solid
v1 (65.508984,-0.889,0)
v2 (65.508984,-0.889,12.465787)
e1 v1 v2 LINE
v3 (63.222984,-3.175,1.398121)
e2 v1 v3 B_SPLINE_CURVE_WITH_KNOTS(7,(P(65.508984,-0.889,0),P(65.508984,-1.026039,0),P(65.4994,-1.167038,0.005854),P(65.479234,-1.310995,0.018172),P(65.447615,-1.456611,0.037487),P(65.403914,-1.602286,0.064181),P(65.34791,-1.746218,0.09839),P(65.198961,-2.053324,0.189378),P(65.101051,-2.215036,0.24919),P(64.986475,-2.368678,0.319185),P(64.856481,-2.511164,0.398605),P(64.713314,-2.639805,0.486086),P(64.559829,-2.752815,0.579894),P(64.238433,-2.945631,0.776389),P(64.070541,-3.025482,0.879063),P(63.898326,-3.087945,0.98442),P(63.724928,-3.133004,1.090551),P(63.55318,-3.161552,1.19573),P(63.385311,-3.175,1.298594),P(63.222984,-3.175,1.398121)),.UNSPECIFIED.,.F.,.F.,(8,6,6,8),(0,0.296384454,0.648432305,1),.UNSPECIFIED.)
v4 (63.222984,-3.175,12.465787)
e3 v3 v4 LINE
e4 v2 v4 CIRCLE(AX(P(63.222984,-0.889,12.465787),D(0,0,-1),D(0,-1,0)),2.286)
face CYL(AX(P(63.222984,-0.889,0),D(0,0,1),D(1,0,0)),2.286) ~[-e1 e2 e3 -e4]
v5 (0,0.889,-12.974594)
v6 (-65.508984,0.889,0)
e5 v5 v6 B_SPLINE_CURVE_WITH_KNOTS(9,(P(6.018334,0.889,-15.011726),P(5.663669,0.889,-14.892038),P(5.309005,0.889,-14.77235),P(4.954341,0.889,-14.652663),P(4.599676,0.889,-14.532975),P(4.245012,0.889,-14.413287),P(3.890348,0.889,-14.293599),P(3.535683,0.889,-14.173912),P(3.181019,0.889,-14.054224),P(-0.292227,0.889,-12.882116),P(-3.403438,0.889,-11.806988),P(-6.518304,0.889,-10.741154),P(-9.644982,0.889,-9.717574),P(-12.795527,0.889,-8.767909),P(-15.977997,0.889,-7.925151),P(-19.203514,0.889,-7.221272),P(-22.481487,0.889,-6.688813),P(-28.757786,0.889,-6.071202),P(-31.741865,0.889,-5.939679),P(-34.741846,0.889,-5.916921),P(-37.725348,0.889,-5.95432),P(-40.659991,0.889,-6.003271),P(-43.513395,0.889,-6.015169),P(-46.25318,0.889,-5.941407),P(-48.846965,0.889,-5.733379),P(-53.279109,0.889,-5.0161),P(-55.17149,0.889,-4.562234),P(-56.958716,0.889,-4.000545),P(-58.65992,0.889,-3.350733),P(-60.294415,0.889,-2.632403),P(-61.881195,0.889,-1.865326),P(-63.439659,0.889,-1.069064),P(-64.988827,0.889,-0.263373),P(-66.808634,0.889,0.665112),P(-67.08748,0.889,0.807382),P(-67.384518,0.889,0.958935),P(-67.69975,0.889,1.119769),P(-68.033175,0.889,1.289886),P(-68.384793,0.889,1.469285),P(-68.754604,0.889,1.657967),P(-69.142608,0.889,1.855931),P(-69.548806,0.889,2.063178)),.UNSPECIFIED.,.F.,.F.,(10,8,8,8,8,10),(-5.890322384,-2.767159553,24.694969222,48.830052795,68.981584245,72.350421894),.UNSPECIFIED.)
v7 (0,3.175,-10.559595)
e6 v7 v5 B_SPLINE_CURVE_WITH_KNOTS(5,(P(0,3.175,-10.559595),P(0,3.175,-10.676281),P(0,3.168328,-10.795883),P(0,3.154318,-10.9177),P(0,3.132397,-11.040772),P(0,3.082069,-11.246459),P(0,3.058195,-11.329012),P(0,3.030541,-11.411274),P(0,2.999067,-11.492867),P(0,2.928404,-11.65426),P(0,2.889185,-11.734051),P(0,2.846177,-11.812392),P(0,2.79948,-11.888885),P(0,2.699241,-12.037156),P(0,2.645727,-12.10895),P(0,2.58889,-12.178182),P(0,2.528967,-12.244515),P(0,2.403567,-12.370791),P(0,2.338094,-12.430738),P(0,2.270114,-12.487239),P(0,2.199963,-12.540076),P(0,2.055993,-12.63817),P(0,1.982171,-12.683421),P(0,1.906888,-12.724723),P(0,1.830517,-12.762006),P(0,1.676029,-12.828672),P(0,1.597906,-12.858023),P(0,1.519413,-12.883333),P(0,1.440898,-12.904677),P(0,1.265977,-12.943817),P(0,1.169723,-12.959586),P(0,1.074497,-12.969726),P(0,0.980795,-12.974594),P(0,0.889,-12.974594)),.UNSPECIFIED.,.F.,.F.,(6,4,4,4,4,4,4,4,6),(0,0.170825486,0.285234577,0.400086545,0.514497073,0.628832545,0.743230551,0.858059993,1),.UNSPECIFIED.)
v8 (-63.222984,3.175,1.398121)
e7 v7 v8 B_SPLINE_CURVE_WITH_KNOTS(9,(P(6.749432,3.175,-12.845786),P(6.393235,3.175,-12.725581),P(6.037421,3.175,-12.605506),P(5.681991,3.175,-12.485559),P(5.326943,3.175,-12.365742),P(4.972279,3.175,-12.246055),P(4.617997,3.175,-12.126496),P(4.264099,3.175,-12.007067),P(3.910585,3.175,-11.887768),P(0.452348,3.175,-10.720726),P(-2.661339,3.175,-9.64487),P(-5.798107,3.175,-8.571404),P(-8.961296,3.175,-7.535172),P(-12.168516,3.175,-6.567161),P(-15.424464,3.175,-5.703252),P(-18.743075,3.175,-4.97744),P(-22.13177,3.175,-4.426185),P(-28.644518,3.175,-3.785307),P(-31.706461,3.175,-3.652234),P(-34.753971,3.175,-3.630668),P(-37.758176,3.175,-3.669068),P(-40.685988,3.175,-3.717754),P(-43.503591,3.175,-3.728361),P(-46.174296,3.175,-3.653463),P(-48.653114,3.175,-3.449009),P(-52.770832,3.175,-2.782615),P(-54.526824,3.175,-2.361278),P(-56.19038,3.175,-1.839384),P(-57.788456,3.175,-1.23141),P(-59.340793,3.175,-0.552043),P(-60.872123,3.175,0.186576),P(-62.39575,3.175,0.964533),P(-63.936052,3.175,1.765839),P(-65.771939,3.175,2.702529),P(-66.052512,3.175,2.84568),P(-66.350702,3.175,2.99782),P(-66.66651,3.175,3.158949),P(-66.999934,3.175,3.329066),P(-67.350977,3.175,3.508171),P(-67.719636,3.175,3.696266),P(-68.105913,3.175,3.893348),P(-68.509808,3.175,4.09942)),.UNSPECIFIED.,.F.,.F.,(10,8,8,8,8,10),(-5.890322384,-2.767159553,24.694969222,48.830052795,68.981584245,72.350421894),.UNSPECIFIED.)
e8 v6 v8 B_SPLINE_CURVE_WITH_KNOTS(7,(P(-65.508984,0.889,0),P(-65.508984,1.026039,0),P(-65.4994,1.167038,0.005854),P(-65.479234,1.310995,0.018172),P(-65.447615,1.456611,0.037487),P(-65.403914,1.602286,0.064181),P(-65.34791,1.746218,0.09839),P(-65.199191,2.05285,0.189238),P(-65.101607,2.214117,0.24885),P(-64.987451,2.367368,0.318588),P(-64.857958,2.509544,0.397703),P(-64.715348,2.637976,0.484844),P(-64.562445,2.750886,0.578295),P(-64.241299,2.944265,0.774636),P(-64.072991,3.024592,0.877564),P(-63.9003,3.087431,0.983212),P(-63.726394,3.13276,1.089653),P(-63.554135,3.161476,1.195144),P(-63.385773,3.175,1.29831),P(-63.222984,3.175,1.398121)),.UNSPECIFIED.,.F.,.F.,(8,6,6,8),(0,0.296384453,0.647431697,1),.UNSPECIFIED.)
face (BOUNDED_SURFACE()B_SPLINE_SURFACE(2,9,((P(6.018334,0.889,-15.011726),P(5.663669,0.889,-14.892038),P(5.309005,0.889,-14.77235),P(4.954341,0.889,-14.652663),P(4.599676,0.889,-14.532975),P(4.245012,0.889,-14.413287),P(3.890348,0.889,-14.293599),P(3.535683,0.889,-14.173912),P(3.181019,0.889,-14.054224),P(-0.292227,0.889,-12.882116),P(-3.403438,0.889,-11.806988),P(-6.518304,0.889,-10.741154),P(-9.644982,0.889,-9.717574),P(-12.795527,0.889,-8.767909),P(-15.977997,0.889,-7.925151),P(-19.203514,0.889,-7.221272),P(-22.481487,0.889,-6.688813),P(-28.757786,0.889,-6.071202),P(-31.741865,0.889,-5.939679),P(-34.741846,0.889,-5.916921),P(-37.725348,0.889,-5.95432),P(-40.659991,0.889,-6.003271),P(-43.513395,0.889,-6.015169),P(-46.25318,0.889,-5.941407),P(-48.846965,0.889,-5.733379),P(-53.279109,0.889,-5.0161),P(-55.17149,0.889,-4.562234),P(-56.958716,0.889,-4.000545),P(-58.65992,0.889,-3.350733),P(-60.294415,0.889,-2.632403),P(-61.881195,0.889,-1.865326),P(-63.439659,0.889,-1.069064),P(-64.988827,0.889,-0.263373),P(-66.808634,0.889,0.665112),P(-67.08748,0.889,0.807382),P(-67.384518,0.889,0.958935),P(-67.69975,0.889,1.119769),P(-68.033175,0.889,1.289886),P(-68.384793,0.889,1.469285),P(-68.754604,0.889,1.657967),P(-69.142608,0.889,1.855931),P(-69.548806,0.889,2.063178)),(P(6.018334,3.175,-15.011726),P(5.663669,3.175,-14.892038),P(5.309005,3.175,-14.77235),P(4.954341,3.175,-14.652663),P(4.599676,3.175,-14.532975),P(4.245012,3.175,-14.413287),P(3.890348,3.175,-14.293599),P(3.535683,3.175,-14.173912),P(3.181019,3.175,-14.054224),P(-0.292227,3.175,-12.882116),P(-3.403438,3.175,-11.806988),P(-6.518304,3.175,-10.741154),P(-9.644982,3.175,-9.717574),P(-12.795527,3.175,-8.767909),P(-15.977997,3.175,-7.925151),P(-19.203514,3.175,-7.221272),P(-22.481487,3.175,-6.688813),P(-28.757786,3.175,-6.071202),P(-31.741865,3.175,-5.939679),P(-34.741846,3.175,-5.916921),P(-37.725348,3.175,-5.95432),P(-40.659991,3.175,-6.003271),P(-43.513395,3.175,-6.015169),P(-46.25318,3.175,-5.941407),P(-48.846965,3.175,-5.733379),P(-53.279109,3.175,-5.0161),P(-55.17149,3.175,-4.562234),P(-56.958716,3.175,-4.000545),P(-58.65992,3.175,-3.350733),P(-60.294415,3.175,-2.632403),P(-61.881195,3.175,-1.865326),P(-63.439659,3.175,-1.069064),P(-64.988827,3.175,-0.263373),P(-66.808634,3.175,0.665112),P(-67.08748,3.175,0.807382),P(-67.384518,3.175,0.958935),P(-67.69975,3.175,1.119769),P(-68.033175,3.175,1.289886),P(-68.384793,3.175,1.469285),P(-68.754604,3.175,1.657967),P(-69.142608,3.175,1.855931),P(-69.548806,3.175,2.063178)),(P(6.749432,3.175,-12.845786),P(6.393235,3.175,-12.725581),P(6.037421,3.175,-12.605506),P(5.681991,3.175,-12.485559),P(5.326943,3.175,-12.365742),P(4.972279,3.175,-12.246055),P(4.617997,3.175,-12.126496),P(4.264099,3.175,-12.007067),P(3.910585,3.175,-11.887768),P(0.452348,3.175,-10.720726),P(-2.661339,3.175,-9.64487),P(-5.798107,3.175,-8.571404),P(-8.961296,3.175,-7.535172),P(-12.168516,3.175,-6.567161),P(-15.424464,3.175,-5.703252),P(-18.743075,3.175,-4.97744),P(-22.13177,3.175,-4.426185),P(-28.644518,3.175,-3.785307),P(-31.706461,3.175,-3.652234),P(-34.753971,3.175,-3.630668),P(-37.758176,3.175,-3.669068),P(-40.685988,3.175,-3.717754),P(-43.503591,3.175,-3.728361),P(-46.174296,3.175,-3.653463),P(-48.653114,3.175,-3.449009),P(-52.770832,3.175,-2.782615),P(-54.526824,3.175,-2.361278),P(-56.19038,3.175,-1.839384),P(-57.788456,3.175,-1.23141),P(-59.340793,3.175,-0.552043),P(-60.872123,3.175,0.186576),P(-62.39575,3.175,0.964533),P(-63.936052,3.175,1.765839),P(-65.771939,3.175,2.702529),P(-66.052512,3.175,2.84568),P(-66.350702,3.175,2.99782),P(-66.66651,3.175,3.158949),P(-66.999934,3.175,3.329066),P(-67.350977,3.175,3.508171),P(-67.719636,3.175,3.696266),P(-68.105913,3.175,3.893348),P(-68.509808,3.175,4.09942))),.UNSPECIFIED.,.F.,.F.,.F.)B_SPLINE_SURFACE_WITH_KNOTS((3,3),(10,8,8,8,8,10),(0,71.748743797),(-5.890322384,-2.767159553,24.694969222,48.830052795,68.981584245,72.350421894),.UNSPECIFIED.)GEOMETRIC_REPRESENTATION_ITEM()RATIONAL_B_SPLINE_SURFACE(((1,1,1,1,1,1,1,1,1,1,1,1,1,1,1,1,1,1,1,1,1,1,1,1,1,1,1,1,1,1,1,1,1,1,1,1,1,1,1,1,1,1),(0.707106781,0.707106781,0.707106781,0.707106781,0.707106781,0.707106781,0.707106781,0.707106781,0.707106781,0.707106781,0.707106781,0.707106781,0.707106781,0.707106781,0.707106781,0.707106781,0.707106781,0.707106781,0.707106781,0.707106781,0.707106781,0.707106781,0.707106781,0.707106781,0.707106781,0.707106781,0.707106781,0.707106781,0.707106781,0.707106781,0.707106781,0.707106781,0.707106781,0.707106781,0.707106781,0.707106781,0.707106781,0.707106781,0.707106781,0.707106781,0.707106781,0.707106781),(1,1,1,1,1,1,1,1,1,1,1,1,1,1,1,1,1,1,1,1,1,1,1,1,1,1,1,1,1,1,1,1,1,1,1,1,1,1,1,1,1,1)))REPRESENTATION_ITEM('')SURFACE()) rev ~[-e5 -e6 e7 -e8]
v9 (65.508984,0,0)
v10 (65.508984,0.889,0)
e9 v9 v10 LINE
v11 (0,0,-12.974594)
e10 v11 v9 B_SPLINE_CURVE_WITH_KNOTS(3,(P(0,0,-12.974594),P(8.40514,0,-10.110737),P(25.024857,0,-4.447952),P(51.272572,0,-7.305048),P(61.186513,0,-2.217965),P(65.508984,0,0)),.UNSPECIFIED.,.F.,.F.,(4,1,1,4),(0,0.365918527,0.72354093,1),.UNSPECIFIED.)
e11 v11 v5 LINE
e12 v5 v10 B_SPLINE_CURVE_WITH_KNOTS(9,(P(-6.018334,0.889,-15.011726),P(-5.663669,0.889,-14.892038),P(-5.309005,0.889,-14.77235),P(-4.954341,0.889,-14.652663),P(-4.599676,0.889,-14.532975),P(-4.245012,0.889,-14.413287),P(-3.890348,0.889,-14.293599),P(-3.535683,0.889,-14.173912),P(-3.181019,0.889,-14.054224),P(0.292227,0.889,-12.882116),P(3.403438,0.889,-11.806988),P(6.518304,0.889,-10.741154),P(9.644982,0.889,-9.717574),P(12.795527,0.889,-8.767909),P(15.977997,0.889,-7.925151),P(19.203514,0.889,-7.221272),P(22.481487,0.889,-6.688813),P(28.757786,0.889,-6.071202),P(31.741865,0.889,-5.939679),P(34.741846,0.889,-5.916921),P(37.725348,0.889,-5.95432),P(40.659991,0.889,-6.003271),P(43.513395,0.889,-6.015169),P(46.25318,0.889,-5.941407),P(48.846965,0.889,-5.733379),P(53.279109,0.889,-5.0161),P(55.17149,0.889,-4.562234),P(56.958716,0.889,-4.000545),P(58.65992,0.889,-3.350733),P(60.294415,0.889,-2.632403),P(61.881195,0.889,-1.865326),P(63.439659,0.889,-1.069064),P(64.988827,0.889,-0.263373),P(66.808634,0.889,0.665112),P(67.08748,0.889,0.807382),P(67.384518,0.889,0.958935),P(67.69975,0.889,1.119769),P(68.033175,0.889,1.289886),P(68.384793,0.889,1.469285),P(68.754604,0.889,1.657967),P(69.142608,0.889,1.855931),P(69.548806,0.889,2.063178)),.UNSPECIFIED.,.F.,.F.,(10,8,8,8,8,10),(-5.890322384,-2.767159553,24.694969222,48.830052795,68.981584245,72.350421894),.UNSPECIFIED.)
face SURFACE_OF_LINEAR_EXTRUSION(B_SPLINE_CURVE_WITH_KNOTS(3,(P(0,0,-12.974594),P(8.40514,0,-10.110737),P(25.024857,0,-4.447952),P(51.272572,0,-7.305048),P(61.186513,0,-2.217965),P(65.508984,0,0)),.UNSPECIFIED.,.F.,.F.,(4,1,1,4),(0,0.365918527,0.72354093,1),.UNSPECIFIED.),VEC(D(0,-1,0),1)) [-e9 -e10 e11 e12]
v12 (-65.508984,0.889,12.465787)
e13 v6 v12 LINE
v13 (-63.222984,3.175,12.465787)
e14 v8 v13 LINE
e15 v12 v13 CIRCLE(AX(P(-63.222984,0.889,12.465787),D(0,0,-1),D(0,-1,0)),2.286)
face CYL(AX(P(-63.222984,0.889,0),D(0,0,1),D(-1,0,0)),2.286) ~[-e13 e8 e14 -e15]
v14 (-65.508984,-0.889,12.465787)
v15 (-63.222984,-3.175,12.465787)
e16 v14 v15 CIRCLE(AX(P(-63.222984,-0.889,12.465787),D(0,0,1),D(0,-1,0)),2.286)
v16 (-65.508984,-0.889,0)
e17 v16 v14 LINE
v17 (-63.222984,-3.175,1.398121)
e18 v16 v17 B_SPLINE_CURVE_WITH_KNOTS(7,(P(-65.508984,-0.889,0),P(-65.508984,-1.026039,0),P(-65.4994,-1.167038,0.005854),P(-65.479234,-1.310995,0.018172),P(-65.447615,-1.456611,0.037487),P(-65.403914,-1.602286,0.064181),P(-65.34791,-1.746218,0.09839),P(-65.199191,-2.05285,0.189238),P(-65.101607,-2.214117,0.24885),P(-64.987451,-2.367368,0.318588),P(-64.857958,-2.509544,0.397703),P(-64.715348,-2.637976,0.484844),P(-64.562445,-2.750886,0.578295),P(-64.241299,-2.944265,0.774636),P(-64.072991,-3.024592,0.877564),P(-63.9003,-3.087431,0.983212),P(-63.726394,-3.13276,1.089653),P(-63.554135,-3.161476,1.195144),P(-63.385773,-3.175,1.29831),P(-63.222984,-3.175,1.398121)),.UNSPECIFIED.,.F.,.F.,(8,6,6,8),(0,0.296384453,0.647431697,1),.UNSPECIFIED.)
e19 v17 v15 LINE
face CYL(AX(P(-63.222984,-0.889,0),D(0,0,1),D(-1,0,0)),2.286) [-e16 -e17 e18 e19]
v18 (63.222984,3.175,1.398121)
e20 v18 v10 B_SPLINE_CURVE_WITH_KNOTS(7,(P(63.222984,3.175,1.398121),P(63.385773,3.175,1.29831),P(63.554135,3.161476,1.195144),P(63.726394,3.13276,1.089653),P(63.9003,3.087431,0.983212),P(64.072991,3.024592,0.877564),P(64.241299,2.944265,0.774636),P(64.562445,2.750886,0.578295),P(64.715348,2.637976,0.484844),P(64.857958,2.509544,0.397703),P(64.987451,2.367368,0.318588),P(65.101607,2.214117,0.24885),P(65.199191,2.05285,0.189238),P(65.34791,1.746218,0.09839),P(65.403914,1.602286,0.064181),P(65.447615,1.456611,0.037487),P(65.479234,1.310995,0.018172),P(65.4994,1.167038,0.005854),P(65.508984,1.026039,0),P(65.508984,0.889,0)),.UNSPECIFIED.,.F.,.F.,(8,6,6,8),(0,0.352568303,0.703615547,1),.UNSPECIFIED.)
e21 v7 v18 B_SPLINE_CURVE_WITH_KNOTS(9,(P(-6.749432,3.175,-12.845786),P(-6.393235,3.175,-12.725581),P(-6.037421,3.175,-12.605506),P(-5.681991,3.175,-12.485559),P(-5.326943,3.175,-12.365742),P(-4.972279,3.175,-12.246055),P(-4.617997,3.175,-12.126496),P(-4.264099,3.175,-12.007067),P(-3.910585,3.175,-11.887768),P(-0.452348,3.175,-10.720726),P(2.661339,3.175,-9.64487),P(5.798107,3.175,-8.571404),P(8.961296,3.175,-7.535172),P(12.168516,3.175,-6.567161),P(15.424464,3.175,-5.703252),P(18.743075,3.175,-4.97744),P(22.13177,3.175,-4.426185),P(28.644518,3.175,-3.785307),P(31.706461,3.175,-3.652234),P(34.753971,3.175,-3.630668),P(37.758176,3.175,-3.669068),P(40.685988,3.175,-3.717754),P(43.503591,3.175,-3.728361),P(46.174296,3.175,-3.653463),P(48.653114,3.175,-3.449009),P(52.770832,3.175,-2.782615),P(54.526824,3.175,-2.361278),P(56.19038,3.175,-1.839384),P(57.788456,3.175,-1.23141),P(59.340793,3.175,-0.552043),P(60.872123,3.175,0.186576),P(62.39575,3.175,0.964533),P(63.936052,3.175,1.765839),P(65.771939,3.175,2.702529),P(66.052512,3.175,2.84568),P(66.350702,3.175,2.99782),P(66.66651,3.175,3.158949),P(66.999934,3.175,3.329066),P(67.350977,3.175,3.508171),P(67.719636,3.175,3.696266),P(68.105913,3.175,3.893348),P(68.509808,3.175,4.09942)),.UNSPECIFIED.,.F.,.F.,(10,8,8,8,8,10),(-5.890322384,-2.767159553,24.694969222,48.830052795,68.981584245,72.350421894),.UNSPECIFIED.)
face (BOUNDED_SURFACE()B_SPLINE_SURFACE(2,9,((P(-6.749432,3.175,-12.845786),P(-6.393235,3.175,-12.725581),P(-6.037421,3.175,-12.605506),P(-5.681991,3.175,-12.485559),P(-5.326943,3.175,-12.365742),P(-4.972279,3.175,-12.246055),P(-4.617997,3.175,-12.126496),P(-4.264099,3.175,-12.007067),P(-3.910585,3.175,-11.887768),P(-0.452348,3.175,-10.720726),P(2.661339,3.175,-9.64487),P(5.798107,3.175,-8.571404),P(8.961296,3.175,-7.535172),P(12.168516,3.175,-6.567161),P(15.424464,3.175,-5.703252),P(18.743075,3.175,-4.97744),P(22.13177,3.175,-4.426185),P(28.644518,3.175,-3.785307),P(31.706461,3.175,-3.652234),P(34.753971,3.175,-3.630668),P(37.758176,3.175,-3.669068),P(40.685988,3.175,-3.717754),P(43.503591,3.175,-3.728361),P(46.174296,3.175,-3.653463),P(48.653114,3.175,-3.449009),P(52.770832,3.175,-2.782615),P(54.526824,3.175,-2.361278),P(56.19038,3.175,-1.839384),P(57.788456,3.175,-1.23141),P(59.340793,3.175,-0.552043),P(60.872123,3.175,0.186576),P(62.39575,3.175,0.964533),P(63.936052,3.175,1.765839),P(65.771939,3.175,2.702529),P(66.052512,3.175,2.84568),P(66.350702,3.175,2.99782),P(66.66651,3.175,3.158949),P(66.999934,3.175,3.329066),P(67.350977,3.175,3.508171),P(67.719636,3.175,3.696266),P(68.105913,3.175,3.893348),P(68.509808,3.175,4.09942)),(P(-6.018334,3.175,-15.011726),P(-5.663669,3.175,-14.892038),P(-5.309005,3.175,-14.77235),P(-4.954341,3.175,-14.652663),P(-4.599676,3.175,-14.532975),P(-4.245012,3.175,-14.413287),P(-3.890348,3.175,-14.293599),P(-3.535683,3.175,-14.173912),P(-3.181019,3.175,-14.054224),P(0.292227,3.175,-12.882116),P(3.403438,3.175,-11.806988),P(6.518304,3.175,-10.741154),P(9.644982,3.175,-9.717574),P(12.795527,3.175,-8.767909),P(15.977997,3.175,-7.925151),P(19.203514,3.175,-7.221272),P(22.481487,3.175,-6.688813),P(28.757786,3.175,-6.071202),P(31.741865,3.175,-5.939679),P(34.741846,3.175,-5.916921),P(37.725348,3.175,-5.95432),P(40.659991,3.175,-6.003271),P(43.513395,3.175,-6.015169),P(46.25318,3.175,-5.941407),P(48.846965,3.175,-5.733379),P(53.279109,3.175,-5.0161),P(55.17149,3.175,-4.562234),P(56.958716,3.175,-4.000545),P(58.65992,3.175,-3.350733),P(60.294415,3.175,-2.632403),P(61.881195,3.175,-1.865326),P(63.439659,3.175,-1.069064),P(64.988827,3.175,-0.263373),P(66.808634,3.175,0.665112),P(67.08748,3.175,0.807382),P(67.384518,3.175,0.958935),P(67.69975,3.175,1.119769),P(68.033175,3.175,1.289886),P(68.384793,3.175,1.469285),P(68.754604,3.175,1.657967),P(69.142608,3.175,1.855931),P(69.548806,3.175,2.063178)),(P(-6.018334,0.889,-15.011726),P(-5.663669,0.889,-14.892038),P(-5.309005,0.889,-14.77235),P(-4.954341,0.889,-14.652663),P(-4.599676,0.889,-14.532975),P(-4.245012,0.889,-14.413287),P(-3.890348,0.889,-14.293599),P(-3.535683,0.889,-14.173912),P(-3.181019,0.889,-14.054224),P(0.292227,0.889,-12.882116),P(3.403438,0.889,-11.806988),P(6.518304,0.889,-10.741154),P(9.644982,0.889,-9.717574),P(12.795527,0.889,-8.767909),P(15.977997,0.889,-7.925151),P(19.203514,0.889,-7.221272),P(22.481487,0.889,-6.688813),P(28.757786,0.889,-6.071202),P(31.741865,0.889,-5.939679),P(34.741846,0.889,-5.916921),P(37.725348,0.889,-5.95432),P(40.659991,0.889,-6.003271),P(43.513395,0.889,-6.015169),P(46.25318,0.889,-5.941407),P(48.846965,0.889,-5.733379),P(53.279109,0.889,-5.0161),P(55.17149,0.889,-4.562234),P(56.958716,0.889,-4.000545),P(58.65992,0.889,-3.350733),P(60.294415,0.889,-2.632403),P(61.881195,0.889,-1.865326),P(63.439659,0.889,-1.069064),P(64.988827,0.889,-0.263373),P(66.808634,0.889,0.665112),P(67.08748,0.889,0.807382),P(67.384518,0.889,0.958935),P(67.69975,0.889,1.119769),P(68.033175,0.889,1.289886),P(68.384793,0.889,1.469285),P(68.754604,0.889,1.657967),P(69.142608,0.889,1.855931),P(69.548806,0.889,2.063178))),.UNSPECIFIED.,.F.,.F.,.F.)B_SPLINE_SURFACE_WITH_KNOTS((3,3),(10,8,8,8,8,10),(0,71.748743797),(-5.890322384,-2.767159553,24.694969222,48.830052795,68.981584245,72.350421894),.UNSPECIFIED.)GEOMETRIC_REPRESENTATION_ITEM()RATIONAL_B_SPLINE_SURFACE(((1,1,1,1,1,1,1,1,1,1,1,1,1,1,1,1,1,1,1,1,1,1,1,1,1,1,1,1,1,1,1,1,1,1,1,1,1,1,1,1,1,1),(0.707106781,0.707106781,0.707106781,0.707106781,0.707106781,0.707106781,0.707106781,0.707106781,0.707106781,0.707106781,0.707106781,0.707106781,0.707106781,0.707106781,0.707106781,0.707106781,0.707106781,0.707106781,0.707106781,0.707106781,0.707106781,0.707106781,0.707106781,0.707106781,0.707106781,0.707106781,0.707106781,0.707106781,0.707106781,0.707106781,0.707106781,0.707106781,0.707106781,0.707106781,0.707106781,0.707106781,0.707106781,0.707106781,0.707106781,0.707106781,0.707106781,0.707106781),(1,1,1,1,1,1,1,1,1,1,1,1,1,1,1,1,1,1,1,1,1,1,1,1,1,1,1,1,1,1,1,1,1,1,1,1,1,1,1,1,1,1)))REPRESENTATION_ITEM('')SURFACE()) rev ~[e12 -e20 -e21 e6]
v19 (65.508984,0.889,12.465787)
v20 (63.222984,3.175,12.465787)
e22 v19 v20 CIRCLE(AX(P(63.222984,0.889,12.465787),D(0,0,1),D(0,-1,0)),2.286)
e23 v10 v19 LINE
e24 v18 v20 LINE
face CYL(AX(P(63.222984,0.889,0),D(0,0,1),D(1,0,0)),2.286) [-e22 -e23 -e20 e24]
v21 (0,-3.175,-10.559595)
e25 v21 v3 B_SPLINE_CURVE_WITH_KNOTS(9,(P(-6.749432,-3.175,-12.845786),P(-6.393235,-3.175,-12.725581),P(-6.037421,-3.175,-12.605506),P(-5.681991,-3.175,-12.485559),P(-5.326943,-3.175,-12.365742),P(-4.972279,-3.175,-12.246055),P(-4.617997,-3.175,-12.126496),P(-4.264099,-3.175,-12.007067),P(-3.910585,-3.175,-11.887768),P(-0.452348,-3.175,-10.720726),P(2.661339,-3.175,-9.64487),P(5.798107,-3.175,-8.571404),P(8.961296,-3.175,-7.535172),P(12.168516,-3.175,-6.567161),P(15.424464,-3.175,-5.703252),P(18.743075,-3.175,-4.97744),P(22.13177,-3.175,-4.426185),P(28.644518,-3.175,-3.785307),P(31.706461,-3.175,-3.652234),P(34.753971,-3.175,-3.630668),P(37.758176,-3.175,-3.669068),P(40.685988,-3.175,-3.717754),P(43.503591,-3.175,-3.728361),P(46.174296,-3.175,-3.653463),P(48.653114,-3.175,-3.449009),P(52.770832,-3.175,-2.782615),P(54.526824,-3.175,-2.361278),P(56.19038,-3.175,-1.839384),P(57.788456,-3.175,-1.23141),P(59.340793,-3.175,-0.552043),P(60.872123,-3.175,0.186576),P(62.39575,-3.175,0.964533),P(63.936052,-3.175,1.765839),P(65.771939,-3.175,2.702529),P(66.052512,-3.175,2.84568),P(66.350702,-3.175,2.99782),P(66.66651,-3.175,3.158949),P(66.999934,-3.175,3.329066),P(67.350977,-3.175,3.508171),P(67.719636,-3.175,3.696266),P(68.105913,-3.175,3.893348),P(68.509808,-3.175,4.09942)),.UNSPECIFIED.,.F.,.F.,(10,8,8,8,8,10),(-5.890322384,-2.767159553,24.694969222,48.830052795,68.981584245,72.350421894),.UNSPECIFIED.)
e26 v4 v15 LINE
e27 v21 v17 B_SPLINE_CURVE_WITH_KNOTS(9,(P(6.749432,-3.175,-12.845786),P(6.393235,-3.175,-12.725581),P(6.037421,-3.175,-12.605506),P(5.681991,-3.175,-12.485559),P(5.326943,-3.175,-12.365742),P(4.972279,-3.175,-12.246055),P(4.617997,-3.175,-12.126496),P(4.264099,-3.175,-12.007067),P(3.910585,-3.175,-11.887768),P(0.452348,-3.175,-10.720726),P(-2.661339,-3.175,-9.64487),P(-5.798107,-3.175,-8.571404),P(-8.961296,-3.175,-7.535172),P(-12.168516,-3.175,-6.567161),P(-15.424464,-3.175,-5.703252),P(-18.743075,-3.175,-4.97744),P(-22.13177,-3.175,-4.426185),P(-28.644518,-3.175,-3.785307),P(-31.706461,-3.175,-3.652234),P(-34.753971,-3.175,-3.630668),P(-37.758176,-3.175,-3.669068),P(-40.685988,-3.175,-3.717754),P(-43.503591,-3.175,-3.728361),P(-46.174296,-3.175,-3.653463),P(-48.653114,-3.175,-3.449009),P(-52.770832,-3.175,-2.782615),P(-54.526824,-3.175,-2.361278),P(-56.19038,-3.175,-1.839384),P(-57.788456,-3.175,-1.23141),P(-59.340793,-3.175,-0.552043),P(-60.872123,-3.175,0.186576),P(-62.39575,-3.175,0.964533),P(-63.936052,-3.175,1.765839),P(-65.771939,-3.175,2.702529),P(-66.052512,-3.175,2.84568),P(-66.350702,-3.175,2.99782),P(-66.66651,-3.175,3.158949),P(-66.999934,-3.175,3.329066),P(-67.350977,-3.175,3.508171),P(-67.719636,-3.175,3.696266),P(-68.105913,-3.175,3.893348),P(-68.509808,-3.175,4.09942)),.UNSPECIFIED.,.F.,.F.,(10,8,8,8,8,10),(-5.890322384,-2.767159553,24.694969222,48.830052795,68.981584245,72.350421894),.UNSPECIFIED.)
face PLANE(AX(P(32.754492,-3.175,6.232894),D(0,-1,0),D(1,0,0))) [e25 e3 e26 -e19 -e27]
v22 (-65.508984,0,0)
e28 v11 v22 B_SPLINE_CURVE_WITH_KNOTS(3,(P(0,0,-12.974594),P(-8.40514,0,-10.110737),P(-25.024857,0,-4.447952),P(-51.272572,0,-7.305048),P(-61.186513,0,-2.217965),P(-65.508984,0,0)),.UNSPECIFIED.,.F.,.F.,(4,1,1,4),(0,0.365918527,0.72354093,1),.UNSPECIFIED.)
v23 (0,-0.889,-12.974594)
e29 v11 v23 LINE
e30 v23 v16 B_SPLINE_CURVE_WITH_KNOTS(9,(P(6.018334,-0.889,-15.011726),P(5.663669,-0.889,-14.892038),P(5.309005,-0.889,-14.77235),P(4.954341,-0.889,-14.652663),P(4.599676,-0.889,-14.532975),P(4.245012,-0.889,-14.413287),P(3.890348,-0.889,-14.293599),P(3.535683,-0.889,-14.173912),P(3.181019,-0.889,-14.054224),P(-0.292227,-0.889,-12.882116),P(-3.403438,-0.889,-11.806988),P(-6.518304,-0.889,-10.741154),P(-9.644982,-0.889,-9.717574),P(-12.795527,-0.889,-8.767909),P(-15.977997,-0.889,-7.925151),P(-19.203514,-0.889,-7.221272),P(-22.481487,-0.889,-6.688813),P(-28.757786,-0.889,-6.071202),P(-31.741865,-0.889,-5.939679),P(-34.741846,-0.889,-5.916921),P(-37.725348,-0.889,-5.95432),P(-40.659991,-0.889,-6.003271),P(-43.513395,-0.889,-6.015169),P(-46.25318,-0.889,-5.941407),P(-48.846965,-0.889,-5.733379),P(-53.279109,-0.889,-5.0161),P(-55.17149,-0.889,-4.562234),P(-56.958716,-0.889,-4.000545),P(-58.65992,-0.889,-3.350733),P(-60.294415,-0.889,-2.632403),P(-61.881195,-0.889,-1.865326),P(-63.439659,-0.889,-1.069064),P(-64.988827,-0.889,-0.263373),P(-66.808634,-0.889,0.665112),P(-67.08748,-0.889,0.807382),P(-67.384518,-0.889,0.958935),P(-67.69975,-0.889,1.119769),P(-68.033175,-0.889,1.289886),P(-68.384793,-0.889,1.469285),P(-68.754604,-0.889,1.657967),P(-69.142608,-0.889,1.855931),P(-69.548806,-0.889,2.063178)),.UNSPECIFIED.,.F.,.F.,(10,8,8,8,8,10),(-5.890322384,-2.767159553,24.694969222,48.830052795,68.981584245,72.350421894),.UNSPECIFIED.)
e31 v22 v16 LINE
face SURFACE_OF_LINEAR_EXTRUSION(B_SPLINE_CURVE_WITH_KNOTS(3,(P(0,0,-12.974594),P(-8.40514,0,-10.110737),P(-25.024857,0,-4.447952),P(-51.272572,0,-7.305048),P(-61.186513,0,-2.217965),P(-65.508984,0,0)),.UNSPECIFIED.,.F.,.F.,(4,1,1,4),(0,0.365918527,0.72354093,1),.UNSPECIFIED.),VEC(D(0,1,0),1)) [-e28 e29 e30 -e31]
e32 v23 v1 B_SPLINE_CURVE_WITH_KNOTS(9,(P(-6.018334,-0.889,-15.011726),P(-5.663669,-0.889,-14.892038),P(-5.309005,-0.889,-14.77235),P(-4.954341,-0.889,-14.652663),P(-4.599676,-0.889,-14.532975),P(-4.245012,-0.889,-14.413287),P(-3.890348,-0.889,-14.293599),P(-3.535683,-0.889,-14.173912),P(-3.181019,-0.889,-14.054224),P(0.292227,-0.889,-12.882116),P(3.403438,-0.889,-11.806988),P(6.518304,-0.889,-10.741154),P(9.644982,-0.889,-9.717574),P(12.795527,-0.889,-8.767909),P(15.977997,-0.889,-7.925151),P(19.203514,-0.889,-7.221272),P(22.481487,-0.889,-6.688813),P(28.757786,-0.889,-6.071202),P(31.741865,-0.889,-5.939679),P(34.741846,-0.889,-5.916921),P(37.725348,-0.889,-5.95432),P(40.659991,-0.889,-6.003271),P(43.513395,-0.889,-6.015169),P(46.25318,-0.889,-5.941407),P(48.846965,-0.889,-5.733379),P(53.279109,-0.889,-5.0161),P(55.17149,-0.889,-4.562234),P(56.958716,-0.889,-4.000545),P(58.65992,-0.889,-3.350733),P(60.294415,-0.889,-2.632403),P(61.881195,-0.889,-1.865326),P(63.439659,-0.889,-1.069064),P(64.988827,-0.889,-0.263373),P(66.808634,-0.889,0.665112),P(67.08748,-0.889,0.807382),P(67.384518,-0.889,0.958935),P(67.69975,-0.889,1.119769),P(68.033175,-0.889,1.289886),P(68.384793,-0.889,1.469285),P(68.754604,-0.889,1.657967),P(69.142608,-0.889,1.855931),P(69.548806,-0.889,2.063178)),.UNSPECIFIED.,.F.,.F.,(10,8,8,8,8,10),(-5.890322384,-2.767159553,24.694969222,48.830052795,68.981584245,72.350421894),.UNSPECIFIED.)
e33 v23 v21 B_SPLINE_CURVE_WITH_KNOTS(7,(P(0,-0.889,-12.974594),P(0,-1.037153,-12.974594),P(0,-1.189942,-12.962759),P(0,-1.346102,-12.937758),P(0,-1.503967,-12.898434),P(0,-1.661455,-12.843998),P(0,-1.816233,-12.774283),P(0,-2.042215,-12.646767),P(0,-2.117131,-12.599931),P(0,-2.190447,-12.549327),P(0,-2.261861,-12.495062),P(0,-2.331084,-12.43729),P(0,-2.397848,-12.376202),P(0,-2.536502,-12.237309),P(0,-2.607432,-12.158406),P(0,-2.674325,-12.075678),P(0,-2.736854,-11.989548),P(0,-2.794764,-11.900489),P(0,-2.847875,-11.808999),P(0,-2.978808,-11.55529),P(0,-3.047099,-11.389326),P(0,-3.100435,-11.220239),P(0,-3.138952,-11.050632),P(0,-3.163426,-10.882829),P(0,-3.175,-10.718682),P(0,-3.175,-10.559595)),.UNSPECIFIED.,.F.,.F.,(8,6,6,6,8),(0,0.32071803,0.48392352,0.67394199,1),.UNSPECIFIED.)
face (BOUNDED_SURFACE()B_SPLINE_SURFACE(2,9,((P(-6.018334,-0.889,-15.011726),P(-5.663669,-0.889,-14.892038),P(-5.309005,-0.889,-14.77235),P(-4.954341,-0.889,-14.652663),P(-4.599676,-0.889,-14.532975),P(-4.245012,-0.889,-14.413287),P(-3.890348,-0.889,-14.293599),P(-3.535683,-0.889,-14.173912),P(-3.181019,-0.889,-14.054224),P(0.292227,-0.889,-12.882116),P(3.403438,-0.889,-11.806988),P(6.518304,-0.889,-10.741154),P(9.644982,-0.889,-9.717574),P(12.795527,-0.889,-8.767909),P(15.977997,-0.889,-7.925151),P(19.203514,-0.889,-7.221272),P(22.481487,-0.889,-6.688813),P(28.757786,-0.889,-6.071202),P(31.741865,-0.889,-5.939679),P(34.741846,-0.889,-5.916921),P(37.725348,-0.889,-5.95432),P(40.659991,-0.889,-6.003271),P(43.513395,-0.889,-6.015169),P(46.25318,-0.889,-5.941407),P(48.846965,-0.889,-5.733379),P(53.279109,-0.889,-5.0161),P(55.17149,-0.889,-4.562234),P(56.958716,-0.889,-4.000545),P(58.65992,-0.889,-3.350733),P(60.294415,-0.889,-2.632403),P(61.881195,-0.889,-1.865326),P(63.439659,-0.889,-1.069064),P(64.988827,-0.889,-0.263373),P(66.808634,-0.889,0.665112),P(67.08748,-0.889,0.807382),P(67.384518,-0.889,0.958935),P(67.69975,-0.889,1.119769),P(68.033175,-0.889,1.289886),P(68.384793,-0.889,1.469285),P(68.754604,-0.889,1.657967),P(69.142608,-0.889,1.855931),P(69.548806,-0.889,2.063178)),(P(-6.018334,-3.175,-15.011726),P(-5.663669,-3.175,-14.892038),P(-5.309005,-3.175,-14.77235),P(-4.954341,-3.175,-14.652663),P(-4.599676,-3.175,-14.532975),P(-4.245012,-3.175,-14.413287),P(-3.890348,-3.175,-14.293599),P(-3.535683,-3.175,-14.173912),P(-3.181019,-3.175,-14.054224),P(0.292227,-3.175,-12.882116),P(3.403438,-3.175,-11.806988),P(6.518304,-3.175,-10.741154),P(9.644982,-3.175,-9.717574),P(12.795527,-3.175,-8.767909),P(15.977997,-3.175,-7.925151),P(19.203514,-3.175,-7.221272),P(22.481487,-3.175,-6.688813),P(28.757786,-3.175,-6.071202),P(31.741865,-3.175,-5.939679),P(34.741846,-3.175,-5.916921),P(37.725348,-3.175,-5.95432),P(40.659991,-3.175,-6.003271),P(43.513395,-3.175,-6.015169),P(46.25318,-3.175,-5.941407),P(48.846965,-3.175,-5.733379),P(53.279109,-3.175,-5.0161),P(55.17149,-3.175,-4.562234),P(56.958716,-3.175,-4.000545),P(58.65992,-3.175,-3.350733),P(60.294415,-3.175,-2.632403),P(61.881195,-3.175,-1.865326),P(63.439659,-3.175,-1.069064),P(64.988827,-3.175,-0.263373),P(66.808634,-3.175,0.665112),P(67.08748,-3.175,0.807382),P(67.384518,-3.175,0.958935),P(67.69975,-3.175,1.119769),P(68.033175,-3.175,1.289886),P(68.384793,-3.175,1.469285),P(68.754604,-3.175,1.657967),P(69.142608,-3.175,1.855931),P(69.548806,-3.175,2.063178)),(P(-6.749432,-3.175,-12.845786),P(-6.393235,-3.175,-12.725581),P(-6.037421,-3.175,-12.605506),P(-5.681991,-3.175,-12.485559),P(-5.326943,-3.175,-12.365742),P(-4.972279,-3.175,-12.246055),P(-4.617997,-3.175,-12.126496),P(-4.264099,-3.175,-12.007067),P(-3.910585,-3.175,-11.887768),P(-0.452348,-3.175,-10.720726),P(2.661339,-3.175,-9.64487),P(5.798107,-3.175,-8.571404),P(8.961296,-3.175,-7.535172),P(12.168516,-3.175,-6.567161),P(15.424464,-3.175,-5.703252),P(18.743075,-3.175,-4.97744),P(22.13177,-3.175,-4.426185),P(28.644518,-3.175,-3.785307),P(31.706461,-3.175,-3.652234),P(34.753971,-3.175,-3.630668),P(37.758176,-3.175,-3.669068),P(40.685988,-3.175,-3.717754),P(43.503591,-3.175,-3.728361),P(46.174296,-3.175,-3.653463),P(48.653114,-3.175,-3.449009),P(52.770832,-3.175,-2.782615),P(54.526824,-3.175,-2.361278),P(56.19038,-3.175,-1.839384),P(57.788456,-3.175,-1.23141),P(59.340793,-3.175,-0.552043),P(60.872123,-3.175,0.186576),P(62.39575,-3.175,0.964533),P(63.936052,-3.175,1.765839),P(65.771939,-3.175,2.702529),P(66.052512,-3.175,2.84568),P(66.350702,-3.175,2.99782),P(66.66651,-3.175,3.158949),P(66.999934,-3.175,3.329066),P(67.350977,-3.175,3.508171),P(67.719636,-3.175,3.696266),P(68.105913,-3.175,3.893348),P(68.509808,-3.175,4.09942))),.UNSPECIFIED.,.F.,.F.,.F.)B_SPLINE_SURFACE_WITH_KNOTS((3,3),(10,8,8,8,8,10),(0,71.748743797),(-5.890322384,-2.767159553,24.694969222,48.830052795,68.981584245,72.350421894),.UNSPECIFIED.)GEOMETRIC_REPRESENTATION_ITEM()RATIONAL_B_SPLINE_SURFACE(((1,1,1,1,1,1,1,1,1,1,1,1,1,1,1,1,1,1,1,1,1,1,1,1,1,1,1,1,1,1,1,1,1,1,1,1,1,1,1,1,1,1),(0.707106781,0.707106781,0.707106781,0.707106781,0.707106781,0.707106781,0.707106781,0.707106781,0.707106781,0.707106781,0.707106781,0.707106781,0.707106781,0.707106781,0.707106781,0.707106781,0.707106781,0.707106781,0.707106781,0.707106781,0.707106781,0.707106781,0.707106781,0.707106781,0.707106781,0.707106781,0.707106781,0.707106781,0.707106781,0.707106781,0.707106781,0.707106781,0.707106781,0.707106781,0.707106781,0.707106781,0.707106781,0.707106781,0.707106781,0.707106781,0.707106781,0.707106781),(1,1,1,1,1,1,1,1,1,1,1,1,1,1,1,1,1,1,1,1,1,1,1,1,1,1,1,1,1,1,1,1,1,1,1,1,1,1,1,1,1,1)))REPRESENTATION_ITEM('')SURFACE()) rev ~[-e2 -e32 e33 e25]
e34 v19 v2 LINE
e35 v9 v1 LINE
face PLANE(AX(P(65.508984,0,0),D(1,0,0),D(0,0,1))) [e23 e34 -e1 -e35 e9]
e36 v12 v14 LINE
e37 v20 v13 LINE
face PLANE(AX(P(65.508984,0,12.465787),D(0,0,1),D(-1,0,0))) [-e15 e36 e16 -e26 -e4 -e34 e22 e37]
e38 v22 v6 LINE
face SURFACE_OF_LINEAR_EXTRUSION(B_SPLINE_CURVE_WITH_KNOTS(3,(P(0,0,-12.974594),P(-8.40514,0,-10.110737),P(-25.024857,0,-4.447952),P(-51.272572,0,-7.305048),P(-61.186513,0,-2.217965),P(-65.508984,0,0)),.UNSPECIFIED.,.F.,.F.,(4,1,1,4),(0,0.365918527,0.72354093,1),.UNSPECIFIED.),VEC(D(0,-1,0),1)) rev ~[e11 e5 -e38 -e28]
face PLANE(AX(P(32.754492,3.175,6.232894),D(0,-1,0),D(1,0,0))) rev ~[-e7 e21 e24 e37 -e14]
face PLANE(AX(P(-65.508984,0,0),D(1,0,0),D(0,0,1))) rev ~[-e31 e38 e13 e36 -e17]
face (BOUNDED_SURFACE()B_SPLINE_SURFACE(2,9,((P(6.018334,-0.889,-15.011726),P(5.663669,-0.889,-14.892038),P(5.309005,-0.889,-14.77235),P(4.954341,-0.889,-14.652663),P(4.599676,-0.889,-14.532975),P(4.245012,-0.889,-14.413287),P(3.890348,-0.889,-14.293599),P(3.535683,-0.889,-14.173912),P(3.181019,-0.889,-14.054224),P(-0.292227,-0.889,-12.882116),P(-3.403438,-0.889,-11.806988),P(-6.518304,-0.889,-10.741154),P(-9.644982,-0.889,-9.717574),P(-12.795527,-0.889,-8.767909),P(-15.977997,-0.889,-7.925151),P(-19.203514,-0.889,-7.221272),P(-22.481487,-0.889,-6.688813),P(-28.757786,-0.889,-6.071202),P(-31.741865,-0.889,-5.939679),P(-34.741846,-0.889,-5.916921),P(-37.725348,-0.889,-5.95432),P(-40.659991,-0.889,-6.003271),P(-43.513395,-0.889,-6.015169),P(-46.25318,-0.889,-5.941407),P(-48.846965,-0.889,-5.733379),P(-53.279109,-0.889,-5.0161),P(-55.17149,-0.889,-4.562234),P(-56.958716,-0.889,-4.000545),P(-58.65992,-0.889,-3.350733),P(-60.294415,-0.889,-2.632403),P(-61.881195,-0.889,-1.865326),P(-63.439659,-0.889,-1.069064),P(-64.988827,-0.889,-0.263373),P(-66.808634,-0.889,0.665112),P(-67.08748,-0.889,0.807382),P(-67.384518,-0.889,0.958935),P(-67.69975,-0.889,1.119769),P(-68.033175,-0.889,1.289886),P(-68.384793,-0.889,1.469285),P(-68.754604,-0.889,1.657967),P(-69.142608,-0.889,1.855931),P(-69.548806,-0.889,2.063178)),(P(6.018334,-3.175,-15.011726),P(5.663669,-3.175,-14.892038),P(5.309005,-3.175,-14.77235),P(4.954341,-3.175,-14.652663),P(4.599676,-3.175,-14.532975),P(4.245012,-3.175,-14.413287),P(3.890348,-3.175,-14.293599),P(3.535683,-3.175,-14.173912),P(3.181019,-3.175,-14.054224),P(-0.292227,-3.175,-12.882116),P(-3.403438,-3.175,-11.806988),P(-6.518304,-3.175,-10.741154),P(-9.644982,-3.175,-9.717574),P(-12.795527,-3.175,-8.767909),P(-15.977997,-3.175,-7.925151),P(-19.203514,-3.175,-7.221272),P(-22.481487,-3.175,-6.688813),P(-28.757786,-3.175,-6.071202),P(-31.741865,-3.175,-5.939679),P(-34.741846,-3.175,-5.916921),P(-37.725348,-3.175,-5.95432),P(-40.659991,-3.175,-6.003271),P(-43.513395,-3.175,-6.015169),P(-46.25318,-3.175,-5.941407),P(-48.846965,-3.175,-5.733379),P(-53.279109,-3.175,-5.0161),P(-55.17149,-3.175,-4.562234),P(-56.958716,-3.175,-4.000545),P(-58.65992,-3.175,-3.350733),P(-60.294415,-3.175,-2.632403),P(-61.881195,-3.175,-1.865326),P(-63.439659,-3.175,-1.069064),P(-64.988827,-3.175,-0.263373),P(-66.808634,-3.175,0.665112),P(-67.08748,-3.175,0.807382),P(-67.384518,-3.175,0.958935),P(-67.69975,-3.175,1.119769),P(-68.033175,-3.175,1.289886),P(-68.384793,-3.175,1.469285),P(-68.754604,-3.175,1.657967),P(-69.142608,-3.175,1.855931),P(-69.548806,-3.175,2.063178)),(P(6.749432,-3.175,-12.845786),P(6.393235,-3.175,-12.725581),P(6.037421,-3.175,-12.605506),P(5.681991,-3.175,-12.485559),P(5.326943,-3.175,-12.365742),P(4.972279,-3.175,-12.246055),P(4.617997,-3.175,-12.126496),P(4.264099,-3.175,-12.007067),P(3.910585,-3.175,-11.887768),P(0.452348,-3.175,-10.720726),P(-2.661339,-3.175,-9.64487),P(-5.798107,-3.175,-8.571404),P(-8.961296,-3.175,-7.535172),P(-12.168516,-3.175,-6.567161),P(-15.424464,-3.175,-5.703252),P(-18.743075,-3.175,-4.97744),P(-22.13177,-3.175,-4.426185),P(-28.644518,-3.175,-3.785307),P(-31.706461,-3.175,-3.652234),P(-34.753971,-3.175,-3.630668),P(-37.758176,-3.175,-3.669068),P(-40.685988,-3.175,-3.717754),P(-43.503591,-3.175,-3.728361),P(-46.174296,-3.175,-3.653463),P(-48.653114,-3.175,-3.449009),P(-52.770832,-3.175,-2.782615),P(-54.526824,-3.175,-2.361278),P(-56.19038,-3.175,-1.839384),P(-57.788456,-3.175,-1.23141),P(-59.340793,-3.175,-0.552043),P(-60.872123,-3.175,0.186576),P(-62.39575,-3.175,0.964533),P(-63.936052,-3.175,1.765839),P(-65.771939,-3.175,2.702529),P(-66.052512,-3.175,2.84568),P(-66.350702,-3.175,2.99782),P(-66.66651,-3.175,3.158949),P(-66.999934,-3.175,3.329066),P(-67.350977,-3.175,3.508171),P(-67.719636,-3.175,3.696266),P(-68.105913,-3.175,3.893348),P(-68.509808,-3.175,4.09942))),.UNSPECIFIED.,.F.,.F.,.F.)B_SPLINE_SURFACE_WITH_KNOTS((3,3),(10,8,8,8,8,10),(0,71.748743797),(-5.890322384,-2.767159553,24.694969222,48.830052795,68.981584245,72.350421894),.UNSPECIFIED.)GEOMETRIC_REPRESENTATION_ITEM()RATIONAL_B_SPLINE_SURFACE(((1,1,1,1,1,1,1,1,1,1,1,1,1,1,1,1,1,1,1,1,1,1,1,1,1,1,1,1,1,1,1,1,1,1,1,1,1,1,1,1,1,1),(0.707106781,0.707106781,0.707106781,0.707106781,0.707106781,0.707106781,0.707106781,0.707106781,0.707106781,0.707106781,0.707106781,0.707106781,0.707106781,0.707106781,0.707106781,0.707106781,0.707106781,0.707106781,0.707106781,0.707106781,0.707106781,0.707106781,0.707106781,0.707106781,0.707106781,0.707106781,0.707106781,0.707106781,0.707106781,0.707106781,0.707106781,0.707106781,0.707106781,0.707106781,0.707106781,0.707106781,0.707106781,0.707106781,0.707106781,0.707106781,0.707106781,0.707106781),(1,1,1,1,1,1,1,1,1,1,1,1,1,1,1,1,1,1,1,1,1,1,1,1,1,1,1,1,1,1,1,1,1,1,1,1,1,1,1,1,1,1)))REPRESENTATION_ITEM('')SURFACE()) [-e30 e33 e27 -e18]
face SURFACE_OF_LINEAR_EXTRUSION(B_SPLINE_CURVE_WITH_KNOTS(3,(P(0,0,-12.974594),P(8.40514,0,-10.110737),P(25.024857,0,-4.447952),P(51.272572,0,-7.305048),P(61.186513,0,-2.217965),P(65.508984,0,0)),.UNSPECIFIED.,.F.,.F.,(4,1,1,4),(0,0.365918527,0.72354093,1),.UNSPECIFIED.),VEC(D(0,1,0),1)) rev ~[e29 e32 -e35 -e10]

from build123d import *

# Parameters (mm, degrees)
F0_W     = 65.5089840293
F0_H     = 12.4657871202
F1_DEPTH = 3.175
F2_R     = 2.286


with BuildPart() as f1:
    # F0 (on Front) → F1 (new body, symmetric)
    with BuildSketch(Plane.XZ):
        with Locations((32.7544920146, 6.2328935601)):
            Rectangle(F0_W, F0_H)
        with Locations((-32.7544920146, 6.2328935601)):
            Rectangle(F0_W, F0_H)
        with BuildLine():
            Line((65.5089840293, 0), (0, 0))
            Line((0, 0), (0, -12.9745937884))
            add(Edge.make_bspline(
                [(0, -12.9745937884), (8.4051395557, -10.1107367384), (25.0248568997, -4.4479521566), (51.2725717155, -7.3050479768), (61.1865127872, -2.2179646884), (65.5089840293, 0)],
                knots=[0, 0, 0, 0, 0.3659185269, 0.7235409296, 1, 1, 1, 1], degree=3))
        make_face()
        with BuildLine():
            Line((0, -12.9745937884), (0, 0))
            Line((0, 0), (-65.5089840293, 0))
            add(Edge.make_bspline(
                [(0, -12.9745937884), (-8.4051395557, -10.1107367384), (-25.0248568997, -4.4479521566), (-51.2725717155, -7.3050479768), (-61.1865127872, -2.2179646884), (-65.5089840293, 0)],
                knots=[0, 0, 0, 0, 0.3659185269, 0.7235409296, 1, 1, 1, 1], degree=3))
        make_face()
    extrude(amount=F1_DEPTH, both=True)

    # F2
    f2_edges = [f1.edges().sort_by_distance(p)[0] for p in [
        (-32.834886, -3.175, -5.993997),
        (32.834886, -3.175, -5.993997),
        (32.834886, 3.175, -5.993997),
        (-32.834886, 3.175, -5.993997),
        (65.508984, 3.175, 6.232894),
        (65.508984, -3.175, 6.232894),
        (-65.508984, 3.175, 6.232894),
        (-65.508984, -3.175, 6.232894),
    ]]
    fillet(f2_edges, radius=F2_R)


solid = f1.part
